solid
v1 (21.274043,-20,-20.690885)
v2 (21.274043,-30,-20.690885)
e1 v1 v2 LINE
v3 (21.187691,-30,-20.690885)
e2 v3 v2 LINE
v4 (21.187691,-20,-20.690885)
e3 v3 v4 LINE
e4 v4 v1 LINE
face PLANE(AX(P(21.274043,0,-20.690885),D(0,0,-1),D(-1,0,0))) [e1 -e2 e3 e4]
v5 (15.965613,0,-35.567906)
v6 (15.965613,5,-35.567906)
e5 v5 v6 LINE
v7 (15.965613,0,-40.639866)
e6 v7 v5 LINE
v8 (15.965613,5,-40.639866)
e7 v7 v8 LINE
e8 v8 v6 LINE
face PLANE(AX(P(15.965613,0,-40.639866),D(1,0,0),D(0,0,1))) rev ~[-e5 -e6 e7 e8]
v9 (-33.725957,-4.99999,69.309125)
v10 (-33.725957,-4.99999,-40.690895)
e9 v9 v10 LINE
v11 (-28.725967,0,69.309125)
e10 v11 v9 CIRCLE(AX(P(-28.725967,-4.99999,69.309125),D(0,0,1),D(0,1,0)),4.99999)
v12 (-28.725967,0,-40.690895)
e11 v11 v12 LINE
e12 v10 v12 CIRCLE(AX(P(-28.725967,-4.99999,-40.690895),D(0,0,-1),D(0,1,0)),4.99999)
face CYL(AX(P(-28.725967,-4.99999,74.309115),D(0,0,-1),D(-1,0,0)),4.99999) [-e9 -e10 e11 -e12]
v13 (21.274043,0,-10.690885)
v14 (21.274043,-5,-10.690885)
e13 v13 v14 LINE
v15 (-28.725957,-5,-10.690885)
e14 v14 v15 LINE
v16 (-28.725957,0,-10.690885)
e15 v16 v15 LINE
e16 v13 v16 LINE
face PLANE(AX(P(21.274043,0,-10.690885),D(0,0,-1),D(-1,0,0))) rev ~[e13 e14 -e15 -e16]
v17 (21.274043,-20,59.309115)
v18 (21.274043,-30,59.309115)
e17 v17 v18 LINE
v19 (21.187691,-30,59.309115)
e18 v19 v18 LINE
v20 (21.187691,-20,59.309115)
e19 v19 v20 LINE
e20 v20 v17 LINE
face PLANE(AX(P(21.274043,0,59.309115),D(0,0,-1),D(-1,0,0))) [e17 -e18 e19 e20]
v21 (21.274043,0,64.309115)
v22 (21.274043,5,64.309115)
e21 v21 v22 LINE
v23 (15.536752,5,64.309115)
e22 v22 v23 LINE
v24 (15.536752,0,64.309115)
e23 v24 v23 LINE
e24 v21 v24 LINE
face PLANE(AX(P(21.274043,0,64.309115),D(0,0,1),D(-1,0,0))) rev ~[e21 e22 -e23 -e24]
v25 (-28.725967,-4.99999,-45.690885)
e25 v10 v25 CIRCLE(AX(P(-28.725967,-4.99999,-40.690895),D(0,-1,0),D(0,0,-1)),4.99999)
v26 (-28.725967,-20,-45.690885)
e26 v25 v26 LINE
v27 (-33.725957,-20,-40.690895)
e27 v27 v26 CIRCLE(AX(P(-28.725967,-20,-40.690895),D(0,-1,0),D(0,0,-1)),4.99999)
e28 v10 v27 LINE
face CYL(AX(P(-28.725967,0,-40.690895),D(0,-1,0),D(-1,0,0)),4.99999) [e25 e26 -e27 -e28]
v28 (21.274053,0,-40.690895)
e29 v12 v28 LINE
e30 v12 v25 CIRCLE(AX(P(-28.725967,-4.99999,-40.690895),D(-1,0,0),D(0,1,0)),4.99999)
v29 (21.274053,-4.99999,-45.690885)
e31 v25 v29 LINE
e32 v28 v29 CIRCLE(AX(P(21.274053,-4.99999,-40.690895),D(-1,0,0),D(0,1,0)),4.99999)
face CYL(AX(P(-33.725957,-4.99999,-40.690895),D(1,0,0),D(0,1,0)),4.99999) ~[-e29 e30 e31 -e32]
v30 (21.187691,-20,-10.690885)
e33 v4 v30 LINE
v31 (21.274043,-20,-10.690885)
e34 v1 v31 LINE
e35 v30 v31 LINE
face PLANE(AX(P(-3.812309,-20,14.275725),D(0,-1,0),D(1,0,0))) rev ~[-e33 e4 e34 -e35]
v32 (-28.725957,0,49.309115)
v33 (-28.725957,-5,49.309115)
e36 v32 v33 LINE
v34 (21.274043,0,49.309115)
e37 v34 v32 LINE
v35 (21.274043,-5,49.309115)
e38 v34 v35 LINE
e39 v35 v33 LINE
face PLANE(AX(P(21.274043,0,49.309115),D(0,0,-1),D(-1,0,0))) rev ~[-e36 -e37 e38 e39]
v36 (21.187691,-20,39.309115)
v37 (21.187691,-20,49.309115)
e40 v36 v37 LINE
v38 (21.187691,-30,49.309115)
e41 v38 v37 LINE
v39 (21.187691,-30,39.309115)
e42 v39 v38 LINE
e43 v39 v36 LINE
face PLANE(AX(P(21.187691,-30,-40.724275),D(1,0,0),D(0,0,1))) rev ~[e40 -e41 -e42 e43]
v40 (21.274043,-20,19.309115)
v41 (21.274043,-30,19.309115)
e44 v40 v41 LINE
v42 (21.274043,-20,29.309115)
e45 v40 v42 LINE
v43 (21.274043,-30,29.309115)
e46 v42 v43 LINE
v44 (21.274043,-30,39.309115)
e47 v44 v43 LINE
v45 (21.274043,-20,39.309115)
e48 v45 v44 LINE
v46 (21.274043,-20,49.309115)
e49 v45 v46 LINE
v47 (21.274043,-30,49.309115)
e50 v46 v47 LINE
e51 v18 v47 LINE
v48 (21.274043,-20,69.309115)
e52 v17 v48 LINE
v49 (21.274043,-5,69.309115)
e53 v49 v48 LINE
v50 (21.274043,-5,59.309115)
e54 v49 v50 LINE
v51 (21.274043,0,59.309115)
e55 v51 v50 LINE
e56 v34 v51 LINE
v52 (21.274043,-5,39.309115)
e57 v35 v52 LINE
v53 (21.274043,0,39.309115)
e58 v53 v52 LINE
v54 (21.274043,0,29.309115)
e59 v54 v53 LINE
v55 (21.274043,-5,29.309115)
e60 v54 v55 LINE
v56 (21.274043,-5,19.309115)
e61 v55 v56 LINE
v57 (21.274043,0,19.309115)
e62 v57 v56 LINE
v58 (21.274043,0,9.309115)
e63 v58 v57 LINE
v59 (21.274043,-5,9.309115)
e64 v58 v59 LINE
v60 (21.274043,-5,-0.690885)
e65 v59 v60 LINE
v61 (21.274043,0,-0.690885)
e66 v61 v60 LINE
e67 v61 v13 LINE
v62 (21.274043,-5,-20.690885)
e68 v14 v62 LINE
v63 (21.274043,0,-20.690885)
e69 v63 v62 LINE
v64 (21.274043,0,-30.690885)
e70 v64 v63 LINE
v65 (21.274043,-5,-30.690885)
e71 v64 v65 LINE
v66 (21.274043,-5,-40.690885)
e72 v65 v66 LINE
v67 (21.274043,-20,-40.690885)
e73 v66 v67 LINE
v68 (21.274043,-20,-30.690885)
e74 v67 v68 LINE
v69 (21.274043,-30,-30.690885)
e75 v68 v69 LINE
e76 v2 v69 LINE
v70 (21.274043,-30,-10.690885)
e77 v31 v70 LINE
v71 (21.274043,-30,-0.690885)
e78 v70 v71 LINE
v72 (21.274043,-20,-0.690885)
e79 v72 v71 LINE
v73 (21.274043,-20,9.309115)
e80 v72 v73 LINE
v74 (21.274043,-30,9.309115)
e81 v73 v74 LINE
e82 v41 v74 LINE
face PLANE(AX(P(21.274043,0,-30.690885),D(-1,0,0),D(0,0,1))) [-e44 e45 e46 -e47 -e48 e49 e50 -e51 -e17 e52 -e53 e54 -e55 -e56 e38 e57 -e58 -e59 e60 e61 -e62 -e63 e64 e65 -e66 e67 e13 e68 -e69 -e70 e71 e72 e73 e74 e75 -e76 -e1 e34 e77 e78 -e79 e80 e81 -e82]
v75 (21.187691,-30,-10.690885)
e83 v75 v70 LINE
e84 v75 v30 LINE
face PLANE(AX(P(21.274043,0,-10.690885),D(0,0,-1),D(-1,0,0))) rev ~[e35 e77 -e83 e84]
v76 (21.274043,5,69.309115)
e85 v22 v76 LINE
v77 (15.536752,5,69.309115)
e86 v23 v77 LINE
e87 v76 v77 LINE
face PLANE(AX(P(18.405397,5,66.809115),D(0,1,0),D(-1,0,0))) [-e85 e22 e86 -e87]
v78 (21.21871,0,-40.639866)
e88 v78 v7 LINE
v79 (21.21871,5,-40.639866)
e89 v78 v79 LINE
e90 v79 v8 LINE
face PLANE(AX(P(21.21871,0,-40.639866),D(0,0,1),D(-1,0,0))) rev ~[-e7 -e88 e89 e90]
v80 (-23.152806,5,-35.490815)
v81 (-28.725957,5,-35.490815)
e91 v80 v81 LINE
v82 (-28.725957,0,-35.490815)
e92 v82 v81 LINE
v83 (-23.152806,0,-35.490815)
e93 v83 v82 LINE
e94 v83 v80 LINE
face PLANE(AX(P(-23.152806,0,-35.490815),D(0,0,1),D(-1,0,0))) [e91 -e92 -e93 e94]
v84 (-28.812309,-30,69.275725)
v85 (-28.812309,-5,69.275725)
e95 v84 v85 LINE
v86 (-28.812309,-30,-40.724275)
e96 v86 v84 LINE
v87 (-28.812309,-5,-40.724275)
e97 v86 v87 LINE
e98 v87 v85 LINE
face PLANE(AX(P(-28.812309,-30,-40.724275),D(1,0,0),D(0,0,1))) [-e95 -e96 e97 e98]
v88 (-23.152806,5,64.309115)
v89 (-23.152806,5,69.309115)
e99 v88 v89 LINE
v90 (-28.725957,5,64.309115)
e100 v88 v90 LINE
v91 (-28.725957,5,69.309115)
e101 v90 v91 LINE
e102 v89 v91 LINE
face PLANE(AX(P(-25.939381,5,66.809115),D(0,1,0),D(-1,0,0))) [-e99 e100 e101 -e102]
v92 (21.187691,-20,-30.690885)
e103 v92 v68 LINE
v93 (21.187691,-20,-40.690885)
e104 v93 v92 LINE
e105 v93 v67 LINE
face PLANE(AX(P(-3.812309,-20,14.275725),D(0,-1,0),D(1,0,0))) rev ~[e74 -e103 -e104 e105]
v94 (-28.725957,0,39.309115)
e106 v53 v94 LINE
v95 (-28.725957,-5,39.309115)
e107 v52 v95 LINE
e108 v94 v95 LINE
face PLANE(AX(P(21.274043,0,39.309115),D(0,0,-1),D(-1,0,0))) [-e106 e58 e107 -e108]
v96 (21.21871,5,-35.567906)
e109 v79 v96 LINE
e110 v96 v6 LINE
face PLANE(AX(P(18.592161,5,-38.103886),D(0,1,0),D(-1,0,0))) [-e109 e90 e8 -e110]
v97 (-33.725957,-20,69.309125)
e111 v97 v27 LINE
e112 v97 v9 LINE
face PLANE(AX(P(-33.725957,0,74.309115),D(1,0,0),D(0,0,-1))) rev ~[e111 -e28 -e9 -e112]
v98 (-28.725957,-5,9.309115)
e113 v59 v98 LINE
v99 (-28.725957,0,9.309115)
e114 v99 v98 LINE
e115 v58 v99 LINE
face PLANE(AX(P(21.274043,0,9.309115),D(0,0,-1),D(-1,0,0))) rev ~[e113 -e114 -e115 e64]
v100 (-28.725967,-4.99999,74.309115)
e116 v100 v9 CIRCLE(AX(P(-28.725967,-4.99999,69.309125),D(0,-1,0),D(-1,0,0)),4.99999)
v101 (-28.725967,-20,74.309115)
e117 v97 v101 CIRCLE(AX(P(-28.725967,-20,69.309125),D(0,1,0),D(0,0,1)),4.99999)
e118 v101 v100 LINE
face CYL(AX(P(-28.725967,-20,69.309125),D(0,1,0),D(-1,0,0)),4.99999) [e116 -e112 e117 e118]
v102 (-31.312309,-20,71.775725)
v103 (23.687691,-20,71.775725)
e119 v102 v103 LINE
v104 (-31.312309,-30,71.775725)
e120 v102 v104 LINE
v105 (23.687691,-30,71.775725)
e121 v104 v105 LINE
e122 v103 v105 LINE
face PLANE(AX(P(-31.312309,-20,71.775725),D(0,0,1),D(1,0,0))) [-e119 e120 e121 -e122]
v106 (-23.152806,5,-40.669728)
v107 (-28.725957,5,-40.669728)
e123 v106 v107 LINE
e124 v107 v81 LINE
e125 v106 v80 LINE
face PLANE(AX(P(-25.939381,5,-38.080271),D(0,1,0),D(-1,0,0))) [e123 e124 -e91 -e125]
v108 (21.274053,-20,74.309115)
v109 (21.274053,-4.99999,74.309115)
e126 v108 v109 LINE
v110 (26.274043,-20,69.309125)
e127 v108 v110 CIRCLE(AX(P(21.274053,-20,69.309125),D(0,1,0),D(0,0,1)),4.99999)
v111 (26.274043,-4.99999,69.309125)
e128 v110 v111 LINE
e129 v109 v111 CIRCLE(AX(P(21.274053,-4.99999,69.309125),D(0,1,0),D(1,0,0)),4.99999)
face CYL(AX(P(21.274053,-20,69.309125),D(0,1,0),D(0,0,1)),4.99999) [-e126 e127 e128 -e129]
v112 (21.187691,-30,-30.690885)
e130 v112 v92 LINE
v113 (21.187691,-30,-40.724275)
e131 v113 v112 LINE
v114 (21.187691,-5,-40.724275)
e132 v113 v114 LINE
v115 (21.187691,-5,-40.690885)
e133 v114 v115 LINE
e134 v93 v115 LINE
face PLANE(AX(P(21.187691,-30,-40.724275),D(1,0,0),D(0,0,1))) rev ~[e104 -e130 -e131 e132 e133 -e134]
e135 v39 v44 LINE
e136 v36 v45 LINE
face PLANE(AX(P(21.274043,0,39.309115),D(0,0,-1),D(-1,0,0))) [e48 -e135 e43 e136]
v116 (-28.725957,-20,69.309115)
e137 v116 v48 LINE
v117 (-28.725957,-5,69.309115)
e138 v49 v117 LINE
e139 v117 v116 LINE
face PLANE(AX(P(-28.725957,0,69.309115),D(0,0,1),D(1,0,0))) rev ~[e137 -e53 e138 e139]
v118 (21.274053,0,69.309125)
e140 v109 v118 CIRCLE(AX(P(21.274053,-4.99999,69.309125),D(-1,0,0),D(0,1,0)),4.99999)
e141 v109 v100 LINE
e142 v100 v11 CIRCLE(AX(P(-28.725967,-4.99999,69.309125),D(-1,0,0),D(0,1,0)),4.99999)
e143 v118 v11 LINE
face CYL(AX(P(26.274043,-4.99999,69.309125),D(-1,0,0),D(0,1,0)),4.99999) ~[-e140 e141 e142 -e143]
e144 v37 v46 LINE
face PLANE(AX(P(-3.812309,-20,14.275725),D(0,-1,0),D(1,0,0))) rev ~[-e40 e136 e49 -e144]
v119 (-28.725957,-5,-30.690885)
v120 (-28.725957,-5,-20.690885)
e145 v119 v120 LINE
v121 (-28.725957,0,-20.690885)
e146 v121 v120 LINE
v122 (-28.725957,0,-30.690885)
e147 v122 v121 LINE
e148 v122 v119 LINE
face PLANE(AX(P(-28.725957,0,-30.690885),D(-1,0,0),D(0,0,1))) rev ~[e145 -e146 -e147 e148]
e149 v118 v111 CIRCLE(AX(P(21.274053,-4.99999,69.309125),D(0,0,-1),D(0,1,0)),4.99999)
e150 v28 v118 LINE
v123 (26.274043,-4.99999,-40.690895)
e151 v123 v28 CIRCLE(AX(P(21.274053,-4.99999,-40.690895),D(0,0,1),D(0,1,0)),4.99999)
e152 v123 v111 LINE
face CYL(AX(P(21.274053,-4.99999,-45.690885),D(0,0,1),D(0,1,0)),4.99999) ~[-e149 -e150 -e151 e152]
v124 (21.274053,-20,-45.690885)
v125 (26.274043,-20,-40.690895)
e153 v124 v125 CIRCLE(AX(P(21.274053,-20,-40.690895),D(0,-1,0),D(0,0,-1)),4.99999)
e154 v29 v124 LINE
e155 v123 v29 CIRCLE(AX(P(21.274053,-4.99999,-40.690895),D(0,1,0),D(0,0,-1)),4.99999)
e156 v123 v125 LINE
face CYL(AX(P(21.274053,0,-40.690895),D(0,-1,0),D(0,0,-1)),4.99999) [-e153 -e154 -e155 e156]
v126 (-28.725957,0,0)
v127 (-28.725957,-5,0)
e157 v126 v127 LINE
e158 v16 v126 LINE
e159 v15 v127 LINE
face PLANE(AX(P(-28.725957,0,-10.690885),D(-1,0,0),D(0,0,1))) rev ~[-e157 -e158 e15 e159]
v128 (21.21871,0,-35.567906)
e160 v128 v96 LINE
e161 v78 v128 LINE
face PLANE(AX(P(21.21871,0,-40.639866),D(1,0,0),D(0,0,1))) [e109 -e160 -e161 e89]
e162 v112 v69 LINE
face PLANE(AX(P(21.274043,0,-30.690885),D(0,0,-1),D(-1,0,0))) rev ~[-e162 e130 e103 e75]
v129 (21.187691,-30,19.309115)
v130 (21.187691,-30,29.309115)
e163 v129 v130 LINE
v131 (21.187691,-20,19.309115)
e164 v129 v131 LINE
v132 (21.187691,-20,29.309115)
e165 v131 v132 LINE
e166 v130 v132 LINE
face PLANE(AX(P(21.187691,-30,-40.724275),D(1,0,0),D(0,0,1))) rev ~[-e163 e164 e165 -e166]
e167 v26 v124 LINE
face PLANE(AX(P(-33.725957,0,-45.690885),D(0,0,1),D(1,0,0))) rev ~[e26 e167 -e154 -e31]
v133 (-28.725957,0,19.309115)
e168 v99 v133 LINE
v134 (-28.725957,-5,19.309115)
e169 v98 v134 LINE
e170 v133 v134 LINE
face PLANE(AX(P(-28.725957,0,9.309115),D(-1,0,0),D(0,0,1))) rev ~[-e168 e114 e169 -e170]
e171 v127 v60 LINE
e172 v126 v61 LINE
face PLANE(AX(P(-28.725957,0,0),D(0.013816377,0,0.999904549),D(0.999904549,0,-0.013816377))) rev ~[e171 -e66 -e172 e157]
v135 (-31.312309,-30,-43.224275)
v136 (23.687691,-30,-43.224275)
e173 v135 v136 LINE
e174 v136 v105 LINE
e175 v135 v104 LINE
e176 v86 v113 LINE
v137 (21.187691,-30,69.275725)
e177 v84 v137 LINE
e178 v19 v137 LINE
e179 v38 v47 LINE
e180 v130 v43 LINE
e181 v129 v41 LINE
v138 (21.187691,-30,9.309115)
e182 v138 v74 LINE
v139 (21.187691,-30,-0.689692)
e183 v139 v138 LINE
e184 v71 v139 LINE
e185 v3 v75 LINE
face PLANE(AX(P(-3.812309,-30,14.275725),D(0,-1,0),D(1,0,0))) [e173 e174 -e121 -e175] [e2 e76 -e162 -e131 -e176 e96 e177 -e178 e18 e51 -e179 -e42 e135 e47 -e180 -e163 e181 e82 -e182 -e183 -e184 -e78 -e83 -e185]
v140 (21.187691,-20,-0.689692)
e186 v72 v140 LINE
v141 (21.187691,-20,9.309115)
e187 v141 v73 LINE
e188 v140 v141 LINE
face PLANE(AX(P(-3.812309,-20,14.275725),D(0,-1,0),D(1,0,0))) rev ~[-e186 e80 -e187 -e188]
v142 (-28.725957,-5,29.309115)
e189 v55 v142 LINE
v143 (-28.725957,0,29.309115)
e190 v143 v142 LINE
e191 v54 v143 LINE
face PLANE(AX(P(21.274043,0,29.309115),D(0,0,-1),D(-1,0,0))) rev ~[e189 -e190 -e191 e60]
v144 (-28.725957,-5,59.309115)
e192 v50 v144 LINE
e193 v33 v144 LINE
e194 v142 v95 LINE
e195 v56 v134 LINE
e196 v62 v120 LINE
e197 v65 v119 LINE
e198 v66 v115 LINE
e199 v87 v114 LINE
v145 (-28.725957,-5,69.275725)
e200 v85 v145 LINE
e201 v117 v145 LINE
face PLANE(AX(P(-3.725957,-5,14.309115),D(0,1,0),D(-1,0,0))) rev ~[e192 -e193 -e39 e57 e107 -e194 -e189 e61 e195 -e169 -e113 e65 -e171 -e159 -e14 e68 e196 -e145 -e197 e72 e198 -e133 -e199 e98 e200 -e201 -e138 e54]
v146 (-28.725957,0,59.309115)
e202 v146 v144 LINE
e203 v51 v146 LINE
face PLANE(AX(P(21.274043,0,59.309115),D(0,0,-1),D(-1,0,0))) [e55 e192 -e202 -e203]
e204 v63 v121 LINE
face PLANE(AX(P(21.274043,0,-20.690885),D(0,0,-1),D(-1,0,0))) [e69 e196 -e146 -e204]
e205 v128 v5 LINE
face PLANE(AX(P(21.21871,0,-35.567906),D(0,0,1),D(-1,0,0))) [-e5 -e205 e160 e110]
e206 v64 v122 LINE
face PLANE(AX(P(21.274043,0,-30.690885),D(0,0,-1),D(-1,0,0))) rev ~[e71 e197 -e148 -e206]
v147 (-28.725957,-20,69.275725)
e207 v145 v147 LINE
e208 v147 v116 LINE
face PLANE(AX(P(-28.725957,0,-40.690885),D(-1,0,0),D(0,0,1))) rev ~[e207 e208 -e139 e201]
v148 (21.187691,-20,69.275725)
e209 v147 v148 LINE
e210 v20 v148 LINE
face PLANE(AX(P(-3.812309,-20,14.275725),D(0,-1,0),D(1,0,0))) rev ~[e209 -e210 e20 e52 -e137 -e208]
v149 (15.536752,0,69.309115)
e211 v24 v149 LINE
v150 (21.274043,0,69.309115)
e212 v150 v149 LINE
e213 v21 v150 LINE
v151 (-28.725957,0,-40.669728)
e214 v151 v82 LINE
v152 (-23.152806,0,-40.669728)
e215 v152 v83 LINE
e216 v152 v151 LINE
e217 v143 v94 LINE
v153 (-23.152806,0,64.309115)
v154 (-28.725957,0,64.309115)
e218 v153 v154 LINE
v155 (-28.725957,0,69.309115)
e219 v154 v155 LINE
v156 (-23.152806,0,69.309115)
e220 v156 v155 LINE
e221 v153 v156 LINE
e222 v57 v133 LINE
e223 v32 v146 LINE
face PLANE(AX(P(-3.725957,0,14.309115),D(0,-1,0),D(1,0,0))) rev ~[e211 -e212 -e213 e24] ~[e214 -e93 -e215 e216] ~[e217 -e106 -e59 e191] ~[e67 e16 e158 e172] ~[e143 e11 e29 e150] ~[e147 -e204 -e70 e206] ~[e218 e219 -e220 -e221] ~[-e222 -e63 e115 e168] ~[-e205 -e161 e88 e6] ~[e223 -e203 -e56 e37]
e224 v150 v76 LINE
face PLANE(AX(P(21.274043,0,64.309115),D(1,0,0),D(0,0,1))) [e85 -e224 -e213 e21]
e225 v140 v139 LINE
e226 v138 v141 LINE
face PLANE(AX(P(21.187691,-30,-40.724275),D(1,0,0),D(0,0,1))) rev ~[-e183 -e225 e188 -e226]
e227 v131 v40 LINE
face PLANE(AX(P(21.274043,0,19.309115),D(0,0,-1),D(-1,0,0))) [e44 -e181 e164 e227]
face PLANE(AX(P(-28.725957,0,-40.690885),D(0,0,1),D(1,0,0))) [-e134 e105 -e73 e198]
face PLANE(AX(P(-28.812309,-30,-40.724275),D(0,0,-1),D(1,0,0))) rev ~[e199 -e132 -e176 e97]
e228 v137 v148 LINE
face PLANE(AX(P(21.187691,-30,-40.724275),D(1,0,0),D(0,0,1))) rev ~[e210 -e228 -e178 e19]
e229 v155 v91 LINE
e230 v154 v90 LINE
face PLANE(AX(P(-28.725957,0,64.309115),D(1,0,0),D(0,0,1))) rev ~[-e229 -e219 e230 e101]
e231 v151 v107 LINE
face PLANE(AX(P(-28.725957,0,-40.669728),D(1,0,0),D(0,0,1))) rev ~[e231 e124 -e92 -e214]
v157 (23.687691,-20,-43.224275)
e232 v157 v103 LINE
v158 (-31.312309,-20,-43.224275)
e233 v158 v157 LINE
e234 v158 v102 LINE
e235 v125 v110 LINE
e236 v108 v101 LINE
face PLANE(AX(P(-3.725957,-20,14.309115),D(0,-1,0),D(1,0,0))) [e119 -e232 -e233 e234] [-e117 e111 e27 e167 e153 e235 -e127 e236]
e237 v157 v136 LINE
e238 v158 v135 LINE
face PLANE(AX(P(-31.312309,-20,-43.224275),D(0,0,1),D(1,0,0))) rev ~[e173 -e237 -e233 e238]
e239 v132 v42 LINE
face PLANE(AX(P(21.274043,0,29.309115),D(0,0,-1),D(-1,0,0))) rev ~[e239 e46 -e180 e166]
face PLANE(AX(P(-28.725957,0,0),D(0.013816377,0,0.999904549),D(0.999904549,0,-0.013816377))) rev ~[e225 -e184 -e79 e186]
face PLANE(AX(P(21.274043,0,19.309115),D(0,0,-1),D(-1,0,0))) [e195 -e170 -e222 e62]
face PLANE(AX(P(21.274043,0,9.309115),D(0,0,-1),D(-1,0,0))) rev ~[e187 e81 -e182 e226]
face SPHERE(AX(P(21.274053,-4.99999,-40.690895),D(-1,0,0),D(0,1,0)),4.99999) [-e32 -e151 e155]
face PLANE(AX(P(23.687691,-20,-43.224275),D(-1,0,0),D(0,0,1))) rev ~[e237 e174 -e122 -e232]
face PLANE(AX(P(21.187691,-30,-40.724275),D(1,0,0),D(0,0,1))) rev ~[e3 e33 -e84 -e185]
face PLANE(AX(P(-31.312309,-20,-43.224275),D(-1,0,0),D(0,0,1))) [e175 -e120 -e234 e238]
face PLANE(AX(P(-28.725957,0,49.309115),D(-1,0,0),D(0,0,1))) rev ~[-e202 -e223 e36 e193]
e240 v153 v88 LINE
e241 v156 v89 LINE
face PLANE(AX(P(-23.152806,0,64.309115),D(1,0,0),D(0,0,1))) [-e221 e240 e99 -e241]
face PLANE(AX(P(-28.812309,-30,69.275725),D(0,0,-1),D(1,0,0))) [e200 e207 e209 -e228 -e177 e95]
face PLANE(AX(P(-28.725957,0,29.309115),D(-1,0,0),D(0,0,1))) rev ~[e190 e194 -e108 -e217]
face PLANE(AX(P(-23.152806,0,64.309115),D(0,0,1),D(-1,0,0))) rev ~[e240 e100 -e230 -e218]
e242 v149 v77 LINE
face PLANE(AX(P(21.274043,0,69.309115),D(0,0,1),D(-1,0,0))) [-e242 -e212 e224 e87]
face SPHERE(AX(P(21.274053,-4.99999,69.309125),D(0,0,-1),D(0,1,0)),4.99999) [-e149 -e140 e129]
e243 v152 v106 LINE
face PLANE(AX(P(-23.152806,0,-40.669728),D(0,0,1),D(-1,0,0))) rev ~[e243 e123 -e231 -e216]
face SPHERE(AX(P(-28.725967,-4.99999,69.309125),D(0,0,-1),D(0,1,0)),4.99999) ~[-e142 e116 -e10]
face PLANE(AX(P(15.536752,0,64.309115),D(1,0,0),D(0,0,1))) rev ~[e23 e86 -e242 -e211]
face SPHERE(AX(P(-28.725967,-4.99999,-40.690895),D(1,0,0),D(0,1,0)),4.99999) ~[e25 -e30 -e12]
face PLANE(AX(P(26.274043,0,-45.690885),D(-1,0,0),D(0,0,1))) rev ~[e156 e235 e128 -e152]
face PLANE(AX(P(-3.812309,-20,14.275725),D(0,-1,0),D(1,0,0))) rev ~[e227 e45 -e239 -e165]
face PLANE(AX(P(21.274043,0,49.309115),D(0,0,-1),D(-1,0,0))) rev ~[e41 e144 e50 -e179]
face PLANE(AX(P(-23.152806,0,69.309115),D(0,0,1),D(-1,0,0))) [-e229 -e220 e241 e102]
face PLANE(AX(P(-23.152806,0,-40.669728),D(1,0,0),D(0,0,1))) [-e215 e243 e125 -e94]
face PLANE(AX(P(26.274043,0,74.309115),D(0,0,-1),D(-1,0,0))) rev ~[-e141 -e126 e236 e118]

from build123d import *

# Parameters (mm, degrees)
F0_W      = 55
F0_H      = 115
F0_W_2    = 50
F0_H_2    = 110
F1_DEPTH  = 20
F3_W      = 55
F3_H      = 115
F5_DEPTH  = 10
F6_W      = 50
F6_H      = 110
F7_DEPTH  = 215.8
F8_W      = 60
F8_H      = 120
F9_DEPTH  = 5
F10_W     = 50
F10_H     = 10
F12_DEPTH = 30.001
F13_R     = 4.99999
F14_W     = 5.7372912765
F14_H     = 5
F14_W_2   = 5.2530970424
F14_H_2   = 5.0719603896
F15_DEPTH = 5
F16_W     = 5.5731512606
F16_H     = 5
F16_H_2   = 5.1789134741
F17_DEPTH = 5


# Not quite as in the source:
# - a fillet or chamfer is up to 0.001 mm smaller than in the source, because OpenCascade refuses the exact size


with BuildPart() as f1:
    # F0 (on Front) → F1 (new body)
    with BuildSketch(Plane.XZ):
        Polygon((-31.2259571254, 74.3091152272), (-33.7259571254, 74.3091152272), (-33.7259571254, -45.6908847728), (26.2740428746, -45.6908847728), (26.2740428746, 74.3091152272), align=None)
        with Locations((-3.7259571254, 14.3091152272)):
            Rectangle(F0_W, F0_H, mode=Mode.SUBTRACT)
        with Locations((-3.7259571254, 14.3091152272)):
            Rectangle(F0_W, F0_H)
        with Locations((-3.7259571254, 14.3091152272)):
            Rectangle(F0_W_2, F0_H_2, mode=Mode.SUBTRACT)
    extrude(amount=F1_DEPTH)

    # F3 (on offset) + F4 (on offset) → F5 (join)
    with BuildSketch(Plane.XZ.offset(20)):
        with Locations((-3.8123092055, 14.2757248878)):
            Rectangle(F3_W, F3_H)
    with BuildSketch(Plane.XZ.offset(20)):
        Polygon((-28.6821052432, -40.8934615552), (21.3168207556, -40.8934615552), (20.2441066504, 69.0581277013), (-28.6821052432, 69.0581277013), align=None)
    extrude(amount=F5_DEPTH)

    # F6 (on face) → F7 (cut)
    with BuildSketch(Plane.XZ.offset(30)):
        with Locations((-3.8123092055, 14.2757248878)):
            Rectangle(F6_W, F6_H)
    extrude(amount=-F7_DEPTH, mode=Mode.SUBTRACT)

    # F8 (on face) → F9 (join)
    with BuildSketch(Plane(origin=(0, 0, 0), x_dir=(-1, 0, 0), z_dir=(0, 1, 0))):
        with Locations((3.7259571254, 14.3091152272)):
            Rectangle(F8_W, F8_H)
    extrude(amount=-F9_DEPTH)

    # F10 (on face) → F12 (cut, through all)
    with BuildSketch(Plane(origin=(0, 0, 0), x_dir=(-1, 0, 0), z_dir=(0, 1, 0))):
        with Locations((3.7259571254, 54.3091152272)):
            Rectangle(F10_W, F10_H)
        with Locations((3.7259571254, 34.3091152272)):
            Rectangle(F10_W, F10_H)
        with Locations((3.7259571254, 14.3091152272)):
            Rectangle(F10_W, F10_H)
        Polygon((-21.2740428746, -0.6908847728), (-21.2740428746, -10.6908847728), (28.7259571254, -10.6908847728), (28.7259571254, 0), align=None)
        with Locations((3.7259571254, -25.6908847728)):
            Rectangle(F10_W, F10_H)
    extrude(amount=-F12_DEPTH, mode=Mode.SUBTRACT)

    # F13 (radius 5 in the source; OpenCascade refuses exactly that, so slightly less here)
    f13_edges = [f1.edges().sort_by_distance(p)[0] for p in [
        (-3.725957, 0, -45.690885),
        (-33.725957, 0, 14.309115),
        (26.274043, 0, 14.309115),
        (-3.725957, 0, 74.309115),
        (26.274043, -10, -45.690885),
        (26.274043, -10, 74.309115),
        (-33.725957, -10, -45.690885),
        (-33.725957, -10, 74.309115),
    ]]
    fillet(f13_edges, radius=F13_R)

    # F14 (on face) → F15 (join)
    with BuildSketch(Plane(origin=(0, 0, 0), x_dir=(-1, 0, 0), z_dir=(0, 1, 0))):
        with Locations((-18.4053972363, 66.8091152272)):
            Rectangle(F14_W, F14_H)
        with Locations((-18.5921611264, -38.1038859487)):
            Rectangle(F14_W_2, F14_H_2)
    extrude(amount=F15_DEPTH)

    # F16 (on face) → F17 (join)
    with BuildSketch(Plane(origin=(0, 0, 0), x_dir=(-1, 0, 0), z_dir=(0, 1, 0))):
        with Locations((25.9393814951, 66.8091152272)):
            Rectangle(F16_W, F16_H)
        with Locations((25.9393814951, -38.0802713335)):
            Rectangle(F16_W, F16_H_2)
    extrude(amount=F17_DEPTH)


solid = f1.part
